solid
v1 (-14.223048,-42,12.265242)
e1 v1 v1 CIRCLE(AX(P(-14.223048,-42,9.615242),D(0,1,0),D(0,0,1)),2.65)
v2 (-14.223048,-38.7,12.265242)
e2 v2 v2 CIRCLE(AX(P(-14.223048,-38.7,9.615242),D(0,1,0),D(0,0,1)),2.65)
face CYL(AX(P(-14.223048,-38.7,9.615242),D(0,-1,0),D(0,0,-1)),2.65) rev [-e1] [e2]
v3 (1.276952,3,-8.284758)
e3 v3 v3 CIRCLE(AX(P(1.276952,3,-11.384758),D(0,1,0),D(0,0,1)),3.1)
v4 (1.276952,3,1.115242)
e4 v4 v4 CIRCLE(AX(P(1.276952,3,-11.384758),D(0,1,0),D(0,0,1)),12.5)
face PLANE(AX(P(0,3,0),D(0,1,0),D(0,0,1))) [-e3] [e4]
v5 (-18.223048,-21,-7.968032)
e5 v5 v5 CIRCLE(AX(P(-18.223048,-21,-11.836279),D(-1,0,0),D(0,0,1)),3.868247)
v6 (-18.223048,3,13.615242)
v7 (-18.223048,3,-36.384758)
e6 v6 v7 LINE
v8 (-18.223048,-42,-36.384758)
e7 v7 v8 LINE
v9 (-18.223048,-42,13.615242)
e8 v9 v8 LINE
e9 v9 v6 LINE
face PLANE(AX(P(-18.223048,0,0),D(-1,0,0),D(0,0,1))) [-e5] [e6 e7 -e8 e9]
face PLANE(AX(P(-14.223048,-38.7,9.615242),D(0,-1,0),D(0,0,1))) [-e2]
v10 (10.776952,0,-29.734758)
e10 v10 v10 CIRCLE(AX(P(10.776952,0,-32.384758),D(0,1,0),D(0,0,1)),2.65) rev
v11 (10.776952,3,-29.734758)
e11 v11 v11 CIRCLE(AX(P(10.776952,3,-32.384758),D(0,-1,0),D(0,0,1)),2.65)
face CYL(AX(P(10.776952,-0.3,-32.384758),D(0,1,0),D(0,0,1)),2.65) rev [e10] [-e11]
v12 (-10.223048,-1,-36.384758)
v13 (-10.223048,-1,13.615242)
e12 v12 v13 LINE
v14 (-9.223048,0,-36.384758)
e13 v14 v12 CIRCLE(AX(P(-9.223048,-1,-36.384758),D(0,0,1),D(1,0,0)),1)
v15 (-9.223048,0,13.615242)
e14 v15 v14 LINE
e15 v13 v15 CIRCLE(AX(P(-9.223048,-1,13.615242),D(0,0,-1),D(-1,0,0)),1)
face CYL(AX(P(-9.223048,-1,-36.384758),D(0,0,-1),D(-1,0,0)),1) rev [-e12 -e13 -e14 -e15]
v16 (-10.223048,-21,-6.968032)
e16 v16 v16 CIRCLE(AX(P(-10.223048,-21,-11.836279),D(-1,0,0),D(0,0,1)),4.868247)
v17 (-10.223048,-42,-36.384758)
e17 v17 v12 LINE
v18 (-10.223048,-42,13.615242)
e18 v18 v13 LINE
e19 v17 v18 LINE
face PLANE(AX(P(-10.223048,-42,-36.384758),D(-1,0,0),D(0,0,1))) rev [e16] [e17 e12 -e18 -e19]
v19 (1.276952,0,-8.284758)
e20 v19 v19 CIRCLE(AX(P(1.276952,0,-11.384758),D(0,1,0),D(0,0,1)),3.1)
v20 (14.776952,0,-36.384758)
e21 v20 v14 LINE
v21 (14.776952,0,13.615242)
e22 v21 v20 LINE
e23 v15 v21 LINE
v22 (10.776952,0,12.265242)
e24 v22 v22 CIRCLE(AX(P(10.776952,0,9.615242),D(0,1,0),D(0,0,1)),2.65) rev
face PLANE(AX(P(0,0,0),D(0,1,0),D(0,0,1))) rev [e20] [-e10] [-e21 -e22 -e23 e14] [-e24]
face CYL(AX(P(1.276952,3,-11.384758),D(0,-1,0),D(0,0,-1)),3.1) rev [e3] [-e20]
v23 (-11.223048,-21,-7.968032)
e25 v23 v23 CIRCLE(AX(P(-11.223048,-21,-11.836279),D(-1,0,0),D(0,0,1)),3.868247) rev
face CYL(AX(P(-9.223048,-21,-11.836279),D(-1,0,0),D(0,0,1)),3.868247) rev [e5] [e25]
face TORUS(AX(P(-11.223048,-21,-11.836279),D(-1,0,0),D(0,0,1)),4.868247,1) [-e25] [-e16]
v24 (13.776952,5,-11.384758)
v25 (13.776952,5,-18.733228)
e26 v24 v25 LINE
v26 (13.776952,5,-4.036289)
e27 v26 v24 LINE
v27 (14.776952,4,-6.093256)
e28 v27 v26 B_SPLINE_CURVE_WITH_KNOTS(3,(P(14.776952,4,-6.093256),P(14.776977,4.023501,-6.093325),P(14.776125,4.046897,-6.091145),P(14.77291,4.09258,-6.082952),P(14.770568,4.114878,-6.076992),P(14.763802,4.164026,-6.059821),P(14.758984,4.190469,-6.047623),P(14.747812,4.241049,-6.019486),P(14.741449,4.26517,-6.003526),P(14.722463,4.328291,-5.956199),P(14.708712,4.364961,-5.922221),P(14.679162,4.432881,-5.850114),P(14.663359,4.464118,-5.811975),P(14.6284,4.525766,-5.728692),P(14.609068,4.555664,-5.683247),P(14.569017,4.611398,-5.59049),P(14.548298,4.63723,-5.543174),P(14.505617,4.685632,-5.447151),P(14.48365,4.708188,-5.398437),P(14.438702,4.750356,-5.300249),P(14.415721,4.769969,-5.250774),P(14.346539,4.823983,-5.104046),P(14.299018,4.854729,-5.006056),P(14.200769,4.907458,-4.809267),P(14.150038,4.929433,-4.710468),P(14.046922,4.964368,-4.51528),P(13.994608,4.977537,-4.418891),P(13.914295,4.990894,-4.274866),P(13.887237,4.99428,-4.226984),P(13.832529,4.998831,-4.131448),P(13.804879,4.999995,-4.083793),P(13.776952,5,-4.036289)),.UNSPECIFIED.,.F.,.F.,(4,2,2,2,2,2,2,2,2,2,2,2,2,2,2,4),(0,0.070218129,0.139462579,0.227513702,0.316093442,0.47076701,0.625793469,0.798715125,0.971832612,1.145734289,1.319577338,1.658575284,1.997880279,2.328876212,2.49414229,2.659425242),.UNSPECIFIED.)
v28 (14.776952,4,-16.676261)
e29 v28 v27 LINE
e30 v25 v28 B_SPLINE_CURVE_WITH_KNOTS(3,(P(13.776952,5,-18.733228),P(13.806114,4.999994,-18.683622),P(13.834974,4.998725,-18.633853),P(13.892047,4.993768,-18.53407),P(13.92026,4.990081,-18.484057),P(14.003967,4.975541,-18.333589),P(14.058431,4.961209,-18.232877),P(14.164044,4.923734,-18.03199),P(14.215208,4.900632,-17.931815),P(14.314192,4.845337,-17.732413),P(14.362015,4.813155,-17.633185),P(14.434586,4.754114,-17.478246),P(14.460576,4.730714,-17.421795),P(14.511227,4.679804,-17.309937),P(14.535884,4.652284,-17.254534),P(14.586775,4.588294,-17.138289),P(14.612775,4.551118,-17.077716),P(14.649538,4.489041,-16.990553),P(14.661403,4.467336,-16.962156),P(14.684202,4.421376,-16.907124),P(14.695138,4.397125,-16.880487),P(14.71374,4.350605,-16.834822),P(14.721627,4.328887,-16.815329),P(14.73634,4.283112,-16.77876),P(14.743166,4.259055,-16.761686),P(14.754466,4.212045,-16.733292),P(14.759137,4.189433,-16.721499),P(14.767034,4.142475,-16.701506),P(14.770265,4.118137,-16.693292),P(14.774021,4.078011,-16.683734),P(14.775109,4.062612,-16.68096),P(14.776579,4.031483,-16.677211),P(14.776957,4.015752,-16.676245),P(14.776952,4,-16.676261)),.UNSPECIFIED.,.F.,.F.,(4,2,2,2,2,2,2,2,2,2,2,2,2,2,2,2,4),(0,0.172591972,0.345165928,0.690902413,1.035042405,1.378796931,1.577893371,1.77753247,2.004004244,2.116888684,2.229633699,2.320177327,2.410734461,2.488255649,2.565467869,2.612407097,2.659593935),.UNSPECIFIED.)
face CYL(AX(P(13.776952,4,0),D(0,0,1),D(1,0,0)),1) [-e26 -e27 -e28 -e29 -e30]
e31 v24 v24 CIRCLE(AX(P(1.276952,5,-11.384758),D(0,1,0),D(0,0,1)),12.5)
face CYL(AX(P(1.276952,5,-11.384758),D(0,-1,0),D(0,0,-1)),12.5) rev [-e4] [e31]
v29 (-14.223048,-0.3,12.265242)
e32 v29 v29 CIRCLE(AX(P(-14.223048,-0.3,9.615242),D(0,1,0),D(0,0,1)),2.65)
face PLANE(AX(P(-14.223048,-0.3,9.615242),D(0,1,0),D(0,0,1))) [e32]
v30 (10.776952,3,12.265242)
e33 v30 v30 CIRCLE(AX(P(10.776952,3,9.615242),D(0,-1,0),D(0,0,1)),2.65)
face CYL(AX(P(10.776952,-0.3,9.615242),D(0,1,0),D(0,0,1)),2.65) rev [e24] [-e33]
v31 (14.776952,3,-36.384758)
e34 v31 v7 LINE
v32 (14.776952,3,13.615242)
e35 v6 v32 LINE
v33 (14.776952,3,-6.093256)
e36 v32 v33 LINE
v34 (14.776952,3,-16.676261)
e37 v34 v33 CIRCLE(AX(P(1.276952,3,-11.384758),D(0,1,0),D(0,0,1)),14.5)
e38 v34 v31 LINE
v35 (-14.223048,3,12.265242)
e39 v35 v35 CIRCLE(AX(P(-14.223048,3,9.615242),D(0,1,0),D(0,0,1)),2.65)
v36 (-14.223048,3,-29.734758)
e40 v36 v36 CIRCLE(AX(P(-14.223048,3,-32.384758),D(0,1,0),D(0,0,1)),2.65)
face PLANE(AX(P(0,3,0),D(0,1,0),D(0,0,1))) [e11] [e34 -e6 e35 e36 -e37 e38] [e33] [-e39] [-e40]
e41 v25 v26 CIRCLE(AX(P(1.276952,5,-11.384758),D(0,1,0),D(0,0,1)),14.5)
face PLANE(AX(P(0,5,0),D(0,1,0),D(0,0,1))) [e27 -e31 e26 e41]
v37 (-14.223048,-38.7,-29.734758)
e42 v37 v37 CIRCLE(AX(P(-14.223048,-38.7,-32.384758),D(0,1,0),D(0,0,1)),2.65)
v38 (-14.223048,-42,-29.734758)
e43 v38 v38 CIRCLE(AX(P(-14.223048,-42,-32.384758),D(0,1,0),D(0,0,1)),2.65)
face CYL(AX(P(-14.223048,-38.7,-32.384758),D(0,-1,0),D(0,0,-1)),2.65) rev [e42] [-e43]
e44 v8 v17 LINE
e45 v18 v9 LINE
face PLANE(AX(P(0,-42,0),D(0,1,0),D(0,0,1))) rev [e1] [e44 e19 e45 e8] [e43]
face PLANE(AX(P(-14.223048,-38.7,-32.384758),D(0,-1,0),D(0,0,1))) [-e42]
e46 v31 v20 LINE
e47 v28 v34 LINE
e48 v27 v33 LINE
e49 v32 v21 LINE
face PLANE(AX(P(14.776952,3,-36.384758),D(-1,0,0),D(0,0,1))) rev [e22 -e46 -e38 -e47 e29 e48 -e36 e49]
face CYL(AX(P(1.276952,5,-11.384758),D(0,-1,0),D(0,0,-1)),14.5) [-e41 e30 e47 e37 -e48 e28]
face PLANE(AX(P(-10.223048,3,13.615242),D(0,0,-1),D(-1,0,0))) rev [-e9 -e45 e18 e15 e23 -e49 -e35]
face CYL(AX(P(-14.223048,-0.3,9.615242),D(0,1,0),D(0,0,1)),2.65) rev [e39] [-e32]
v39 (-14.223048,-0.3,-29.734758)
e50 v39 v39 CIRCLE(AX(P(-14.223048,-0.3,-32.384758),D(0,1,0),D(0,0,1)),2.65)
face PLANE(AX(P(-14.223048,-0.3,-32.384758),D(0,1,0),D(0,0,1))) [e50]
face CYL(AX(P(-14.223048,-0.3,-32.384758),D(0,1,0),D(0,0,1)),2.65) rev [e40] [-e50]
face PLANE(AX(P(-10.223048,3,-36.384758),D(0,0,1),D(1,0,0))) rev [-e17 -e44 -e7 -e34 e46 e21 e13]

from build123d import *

# Parameters (mm, degrees)
SKETCH1_W           = 25
SKETCH1_H           = 50
SKETCH1_R           = 3.1
BOSS_EXTRUDE1_DEPTH = 3
SKETCH2_W           = 50
SKETCH2_H           = 3
BOSS_EXTRUDE2_DEPTH = 8
SKETCH3_W           = 8
SKETCH3_H           = 50
BOSS_EXTRUDE3_DEPTH = 42
SKETCH4_R           = 2.65
CUT_EXTRUDE1_DEPTH  = 3.3
SKETCH5_R           = 3.868246804
CUT_EXTRUDE2_DEPTH  = 9
FILLET2_R           = 1
SKETCH6_R           = 12.5
BOSS_EXTRUDE4_DEPTH = 2
FILLET3_R           = 1
FILLET4_R           = 1


with BuildPart() as part:
    # Sketch1 → Boss-Extrude1 (new body)
    with BuildSketch(Plane(origin=(0, 0, 0), x_dir=(1, 0, 0), z_dir=(0, 1, 0))):
        with Locations((2.276951673, 11.384758364)):
            Rectangle(SKETCH1_W, SKETCH1_H)
        with Locations(Location((1.276951673, 11.384758364, 0), (0, 0, 270))):
            Circle(SKETCH1_R, mode=Mode.SUBTRACT)
    extrude(amount=BOSS_EXTRUDE1_DEPTH)

    # Sketch2 → Boss-Extrude2 (add)
    with BuildSketch(Plane.ZY.offset(10.223048327)):
        with Locations((-11.384758364, 1.5)):
            Rectangle(SKETCH2_W, SKETCH2_H)
    extrude(amount=BOSS_EXTRUDE2_DEPTH)

    # Sketch3 → Boss-Extrude3 (add)
    with BuildSketch(Plane.XZ):
        with Locations((-14.223048327, -11.384758364)):
            Rectangle(SKETCH3_W, SKETCH3_H)
    extrude(amount=BOSS_EXTRUDE3_DEPTH)

    # Sketch4 → Cut-Extrude1 (cut)
    with BuildSketch(Plane(origin=(0, 3, 0), x_dir=(1, 0, 0), z_dir=(0, 1, 0))):
        with Locations(Location((-14.223048327, 32.384758364, 0), (0, 0, 270))):
            Circle(SKETCH4_R)
        with Locations(Location((-14.223048327, -9.615241636, 0), (0, 0, 270))):
            Circle(SKETCH4_R)
    cut_extrude1 = extrude(amount=-CUT_EXTRUDE1_DEPTH, mode=Mode.SUBTRACT)

    # Mirror1: Cut-Extrude1 across plane
    add(cut_extrude1.mirror(Plane.ZX.offset(-19.5)), mode=Mode.SUBTRACT)

    # Sketch5 → Cut-Extrude2 (cut)
    with BuildSketch(Plane.ZY.offset(18.223048327)):
        with Locations((-11.836279124, -21)):
            Circle(SKETCH5_R)
    extrude(amount=-CUT_EXTRUDE2_DEPTH, mode=Mode.SUBTRACT)

    # Fillet2
    fillet2_edges = [part.edges().sort_by_distance(p)[0] for p in [
        (-10.223048327, -21, -15.704525928),
    ]]
    fillet(fillet2_edges, radius=FILLET2_R)

    # Mirror2: Cut-Extrude1 across plane
    add(cut_extrude1.mirror(Plane.ZY.offset(1.723048327)), mode=Mode.SUBTRACT)

    # Sketch6 → Boss-Extrude4 (add)
    with BuildSketch(Plane(origin=(0, 3, 0), x_dir=(1, 0, 0), z_dir=(0, 1, 0))):
        with BuildLine():
            Line((14.776951673, 6.093255742), (14.776951673, 16.676260986))
            ThreePointArc((14.776951673, 16.676260986), (-13.223048327, 11.384758364), (14.776951673, 6.093255742))
        make_face()
        with Locations(Location((1.276951673, 11.384758364, 0), (0, 0, 270))):
            Circle(SKETCH6_R, mode=Mode.SUBTRACT)
    extrude(amount=BOSS_EXTRUDE4_DEPTH)

    # Fillet3
    fillet3_edges = [part.edges().sort_by_distance(p)[0] for p in [
        (-10.223048327, 0, -11.384758364),
    ]]
    fillet(fillet3_edges, radius=FILLET3_R)

    # Fillet4
    fillet4_edges = [part.edges().sort_by_distance(p)[0] for p in [
        (14.776951673, 5, -11.384758364),
    ]]
    fillet(fillet4_edges, radius=FILLET4_R - 0.0001)  # a hair under: the kernel refuses the full size


solid = part.part
